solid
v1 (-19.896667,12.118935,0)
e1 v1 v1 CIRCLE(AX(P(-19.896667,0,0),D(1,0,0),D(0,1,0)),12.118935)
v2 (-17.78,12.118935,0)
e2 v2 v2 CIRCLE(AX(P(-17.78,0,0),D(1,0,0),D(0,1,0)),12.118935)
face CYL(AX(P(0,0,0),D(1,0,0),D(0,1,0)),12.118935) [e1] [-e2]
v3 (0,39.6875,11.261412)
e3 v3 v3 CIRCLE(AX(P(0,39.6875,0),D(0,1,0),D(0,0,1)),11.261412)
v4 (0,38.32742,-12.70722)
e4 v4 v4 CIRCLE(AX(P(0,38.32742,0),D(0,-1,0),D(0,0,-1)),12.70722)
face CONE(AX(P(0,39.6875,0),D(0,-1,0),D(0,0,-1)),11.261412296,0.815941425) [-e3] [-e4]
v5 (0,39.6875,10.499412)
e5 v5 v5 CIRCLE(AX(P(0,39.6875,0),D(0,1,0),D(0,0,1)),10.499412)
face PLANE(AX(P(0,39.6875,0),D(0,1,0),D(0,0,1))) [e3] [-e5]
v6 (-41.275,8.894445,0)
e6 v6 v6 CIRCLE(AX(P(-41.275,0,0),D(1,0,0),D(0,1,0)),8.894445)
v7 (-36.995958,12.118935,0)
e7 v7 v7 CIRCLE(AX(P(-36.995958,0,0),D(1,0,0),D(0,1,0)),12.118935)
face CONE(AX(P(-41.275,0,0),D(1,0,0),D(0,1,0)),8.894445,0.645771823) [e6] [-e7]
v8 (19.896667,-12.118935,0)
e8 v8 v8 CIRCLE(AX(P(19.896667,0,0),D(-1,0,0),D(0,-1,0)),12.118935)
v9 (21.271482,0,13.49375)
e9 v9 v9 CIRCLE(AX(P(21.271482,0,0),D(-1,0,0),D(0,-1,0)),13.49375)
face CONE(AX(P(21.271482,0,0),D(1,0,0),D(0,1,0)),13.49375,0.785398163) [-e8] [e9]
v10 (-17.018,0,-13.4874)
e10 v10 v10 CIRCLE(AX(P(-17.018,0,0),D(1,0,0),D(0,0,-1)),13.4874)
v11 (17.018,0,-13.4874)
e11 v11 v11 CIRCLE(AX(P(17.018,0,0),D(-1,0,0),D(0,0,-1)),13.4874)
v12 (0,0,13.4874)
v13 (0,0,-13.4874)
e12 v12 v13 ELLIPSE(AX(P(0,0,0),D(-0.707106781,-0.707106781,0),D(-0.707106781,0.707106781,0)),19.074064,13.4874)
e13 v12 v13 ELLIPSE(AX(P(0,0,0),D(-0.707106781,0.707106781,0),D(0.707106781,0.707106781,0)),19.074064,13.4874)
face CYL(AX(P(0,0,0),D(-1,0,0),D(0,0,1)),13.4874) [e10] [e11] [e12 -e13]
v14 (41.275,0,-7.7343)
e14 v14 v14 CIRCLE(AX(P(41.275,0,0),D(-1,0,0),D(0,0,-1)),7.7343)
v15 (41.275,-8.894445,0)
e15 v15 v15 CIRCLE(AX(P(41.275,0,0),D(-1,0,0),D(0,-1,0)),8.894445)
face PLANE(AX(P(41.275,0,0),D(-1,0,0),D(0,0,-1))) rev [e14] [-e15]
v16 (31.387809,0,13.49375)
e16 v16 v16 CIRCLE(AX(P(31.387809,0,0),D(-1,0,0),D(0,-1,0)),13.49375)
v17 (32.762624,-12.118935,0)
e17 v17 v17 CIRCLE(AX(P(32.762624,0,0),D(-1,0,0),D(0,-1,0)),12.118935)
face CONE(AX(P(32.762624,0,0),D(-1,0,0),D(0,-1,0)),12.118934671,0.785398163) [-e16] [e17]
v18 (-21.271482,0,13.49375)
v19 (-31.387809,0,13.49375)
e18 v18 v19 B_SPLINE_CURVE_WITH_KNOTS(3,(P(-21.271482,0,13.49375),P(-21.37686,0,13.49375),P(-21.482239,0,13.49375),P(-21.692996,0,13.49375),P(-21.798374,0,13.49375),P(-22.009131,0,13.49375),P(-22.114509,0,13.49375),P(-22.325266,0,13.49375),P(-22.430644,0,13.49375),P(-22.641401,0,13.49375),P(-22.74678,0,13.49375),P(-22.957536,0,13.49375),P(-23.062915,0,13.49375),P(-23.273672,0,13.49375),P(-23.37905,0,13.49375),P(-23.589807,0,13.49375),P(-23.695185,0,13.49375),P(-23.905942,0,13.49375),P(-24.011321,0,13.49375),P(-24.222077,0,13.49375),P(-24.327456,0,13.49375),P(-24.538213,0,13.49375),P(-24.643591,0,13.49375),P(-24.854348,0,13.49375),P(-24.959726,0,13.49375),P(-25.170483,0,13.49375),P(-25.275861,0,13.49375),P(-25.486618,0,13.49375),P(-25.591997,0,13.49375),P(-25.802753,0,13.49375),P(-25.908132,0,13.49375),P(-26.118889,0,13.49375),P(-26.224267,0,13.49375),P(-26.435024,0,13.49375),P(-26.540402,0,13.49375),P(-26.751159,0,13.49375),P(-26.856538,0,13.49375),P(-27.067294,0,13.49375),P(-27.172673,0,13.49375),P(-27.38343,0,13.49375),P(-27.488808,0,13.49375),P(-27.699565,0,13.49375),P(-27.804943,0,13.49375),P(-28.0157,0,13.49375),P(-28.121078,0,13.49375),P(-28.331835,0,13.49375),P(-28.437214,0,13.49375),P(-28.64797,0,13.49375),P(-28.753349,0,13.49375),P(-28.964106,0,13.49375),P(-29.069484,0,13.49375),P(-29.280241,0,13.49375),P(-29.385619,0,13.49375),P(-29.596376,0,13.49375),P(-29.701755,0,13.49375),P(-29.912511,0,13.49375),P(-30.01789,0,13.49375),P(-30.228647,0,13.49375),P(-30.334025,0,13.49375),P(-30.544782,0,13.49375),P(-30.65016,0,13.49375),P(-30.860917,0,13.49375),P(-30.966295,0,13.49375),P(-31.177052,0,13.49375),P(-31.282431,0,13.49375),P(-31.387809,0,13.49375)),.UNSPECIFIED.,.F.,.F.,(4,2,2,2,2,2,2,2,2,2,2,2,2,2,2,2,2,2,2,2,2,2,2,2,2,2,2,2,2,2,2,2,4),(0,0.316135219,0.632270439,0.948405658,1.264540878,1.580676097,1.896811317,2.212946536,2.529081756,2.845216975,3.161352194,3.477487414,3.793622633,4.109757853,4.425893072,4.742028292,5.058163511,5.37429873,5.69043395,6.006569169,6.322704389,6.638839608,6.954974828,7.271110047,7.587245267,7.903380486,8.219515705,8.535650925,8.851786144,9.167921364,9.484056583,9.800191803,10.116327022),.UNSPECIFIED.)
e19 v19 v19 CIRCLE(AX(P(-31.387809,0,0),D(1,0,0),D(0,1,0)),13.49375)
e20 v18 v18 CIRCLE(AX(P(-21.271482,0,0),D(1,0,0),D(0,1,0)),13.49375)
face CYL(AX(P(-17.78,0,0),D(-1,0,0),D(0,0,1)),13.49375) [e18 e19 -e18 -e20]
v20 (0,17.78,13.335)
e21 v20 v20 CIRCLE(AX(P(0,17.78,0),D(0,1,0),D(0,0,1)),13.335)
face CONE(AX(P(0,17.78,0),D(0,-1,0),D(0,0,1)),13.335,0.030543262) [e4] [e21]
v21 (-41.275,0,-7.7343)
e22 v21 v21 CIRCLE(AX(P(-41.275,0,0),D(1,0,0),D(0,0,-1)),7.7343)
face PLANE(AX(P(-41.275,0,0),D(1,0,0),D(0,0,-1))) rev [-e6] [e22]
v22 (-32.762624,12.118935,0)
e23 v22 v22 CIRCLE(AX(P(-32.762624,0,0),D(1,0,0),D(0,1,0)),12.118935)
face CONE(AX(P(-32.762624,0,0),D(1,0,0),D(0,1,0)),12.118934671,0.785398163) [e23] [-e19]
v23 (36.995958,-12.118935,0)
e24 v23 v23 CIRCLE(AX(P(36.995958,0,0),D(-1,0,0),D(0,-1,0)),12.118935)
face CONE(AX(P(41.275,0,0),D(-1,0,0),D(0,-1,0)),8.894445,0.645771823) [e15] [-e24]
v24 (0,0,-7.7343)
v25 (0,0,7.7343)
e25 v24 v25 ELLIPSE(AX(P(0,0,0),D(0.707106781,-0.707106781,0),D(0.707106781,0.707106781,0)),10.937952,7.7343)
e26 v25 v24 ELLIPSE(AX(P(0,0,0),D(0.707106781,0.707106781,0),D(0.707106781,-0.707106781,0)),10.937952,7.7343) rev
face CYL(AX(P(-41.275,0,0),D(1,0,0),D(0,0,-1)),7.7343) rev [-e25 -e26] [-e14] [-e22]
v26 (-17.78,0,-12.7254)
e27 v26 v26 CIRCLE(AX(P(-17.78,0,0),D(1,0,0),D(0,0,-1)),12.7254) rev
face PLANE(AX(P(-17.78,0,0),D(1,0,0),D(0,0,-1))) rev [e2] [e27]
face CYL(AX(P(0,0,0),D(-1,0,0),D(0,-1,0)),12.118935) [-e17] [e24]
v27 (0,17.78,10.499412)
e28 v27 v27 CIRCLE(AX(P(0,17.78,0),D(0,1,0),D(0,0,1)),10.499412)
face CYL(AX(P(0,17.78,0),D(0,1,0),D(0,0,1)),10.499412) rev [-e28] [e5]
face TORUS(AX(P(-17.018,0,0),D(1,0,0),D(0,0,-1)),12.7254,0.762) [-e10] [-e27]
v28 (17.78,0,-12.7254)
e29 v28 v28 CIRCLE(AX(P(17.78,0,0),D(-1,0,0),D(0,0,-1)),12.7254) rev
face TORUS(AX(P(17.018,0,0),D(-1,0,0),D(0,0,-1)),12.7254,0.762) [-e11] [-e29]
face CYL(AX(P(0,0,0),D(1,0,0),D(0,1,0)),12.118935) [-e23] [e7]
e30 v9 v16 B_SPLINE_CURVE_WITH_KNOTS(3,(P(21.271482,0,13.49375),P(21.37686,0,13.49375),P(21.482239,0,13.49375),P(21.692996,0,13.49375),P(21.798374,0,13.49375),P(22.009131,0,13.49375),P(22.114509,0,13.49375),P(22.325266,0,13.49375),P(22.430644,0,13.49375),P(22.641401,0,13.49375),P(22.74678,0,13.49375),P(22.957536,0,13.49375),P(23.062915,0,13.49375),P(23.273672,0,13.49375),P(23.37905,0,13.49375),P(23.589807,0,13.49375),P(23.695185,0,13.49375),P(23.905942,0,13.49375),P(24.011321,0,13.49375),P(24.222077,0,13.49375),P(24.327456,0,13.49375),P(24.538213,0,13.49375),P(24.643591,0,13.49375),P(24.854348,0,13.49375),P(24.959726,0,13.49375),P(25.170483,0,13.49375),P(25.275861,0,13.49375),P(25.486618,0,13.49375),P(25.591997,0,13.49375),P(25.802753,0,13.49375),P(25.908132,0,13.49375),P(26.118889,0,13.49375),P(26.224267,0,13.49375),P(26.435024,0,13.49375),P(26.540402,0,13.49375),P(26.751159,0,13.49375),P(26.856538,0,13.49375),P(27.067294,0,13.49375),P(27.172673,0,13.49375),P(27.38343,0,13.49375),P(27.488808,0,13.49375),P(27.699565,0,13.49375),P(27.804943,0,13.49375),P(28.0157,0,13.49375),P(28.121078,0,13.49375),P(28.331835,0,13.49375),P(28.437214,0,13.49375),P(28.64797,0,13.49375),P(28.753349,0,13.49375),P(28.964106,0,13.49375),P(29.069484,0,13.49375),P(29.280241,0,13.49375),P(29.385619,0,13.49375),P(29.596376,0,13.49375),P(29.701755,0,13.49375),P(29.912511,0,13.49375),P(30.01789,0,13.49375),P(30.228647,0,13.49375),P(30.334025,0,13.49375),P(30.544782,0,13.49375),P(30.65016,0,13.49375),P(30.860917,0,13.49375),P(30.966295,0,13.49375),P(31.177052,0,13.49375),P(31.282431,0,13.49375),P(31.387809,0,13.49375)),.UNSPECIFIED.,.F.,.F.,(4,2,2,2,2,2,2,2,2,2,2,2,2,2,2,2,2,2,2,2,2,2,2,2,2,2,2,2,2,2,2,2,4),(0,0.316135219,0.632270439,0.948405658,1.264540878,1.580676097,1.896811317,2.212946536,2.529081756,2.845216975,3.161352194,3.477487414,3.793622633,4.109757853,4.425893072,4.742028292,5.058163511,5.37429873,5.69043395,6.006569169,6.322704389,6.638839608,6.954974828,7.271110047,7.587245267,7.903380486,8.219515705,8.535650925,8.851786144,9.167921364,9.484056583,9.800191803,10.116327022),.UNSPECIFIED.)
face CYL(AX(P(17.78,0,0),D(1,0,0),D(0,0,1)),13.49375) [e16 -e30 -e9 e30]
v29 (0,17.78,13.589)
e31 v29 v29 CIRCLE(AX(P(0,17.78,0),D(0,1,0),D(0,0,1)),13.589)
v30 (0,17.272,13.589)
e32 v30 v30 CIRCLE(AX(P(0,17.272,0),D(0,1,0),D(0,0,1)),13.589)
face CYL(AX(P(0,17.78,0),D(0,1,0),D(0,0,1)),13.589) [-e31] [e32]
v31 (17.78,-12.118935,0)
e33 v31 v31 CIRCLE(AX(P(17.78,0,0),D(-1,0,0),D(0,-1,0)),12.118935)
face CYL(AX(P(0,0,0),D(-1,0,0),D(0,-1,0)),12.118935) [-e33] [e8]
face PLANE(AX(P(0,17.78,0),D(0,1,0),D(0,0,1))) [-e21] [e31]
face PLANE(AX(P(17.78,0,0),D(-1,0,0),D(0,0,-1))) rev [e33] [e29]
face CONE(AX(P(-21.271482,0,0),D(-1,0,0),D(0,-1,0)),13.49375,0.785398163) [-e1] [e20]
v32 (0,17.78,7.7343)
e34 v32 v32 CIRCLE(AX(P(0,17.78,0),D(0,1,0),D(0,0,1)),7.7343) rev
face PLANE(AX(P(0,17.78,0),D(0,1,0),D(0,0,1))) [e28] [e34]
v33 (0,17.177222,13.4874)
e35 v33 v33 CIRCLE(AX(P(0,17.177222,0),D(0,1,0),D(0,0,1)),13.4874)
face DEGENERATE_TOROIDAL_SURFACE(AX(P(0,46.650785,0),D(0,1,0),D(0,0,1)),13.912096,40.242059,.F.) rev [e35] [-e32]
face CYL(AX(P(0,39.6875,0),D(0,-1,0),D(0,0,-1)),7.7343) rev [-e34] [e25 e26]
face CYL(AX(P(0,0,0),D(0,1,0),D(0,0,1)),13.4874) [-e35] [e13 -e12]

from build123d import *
from build123d.topology import SkipClean

# Parameters (mm, degrees)
SKETCH2_R           = 13.49375
EXTRUDE1_DEPTH      = 23.495
SKETCH15_R          = 13.4874
BOSS_EXTRUDE1_DEPTH = 17.78
SKETCH16_R          = 7.7343
CUT_EXTRUDE1_DEPTH  = 46.47293924
SKETCH20_R          = 13.4874
BOSS_EXTRUDE2_DEPTH = 17.78
SKETCH22_R          = 13.335
BOSS_EXTRUDE3_DEPTH = 21.9075
BOSS_EXTRUDE3_TAPER = 1.75
CHAMFER1_SIZE       = 1.360714286
CHAMFER1_SIZE_2     = 1.404253042
SKETCH25_R          = 13.335
BOSS_EXTRUDE4_DEPTH = 21.9075
BOSS_EXTRUDE4_DRAFT = -15
SKETCH28_R          = 10.499412296
CUT_EXTRUDE6_DEPTH  = 21.9075
FILLET1_R           = 0.762
CIRPATTERN1_COUNT   = 2
CIRPATTERN1_ANGLE   = 180
SKETCH26_R          = 7.7343
CUT_EXTRUDE4_DEPTH  = 93.597306097
SKETCH29_R          = 7.7343
CUT_EXTRUDE7_DEPTH  = 59.850524324


with BuildPart() as part:
    # Sketch2 → Extrude1 (new body)
    with BuildSketch(Plane(origin=(-41.275, 0, 0), x_dir=(0, 0, -1), z_dir=(1, 0, 0))):
        with Locations(Location((0, 0, 0), (0, 0, 180))):
            Circle(SKETCH2_R)
    extrude(amount=EXTRUDE1_DEPTH)

    # Sketch5 → Cut-Revolve1 (revolve, cut)
    with BuildSketch(Plane.XY):
        Polygon((-36.995957679, 12.118934671), (-32.762624346, 12.118934671), (-31.387809017, 13.49375), (-41.275, 13.49375), (-41.275, 8.894445), align=None)
        Polygon((-17.78, 12.118934671), (-19.896666667, 12.118934671), (-21.271481995, 13.49375), (-17.78, 13.49375), align=None)
    revolve(axis=Axis((0, 0, 0), (-1, 0, 0)), mode=Mode.SUBTRACT)

    # Sketch15 → Boss-Extrude1 (add)
    with BuildSketch(Plane(origin=(-17.78, 0, 0), x_dir=(0, 0, -1), z_dir=(1, 0, 0))):
        Circle(SKETCH15_R)
    extrude(amount=BOSS_EXTRUDE1_DEPTH)

    # Sketch16 → Cut-Extrude1 (cut, through all)
    with BuildSketch(Plane(origin=(0, 0, 0), x_dir=(0, 0, -1), z_dir=(1, 0, 0))):
        Circle(SKETCH16_R)
    extrude(amount=-CUT_EXTRUDE1_DEPTH, mode=Mode.SUBTRACT)

    # Fillet1
    fillet1_edges = [part.edges().sort_by_distance(p)[0] for p in [
        (-17.78, 0, 13.4874),
    ]]
    fillet(fillet1_edges, radius=FILLET1_R)


with BuildPart() as body_2:
    # Sketch20 → Boss-Extrude2 (new body)
    with BuildSketch(Plane(origin=(0, 17.78, 0), x_dir=(-1, 0, 0), z_dir=(0, 1, 0))):
        with Locations(Location((0, 0, 0), (0, 0, 90))):
            Circle(SKETCH20_R)
    extrude(amount=-BOSS_EXTRUDE2_DEPTH)


with BuildPart() as body_3:
    # Sketch22 → Boss-Extrude3 (new body)
    with BuildSketch(Plane(origin=(0, 17.78, 0), x_dir=(-1, 0, 0), z_dir=(0, 1, 0))):
        Circle(SKETCH22_R)
    extrude(amount=BOSS_EXTRUDE3_DEPTH, taper=BOSS_EXTRUDE3_TAPER)

    # Chamfer1
    # the kernel refuses this chamfer: 1.404253042, 1.360714286 mm, written as the material it takes off along each edge
    with BuildSketch(Plane(origin=(0, 39.6875, 0), x_dir=(-1, 0, 0), z_dir=(0, 0, 1))) as chamfer1_piece_1:
        Polygon((12.665665338 + CHAMFER1_SIZE * 0.0305385132034, CHAMFER1_SIZE * 0.999533590627), (12.665665338 - CHAMFER1_SIZE_2, 0), (12.665665338, 0), align=None)
    revolve(axis=Axis((0, 39.6875, 0), (0, -1, 0)), mode=Mode.SUBTRACT)


with BuildPart() as boss_extrude4_tool:
    # Sketch25 → Boss-Extrude4 (with draft: the straight prism first)
    with BuildSketch(Plane.XZ.offset(-17.78)):
        Circle(SKETCH25_R)
    extrude(amount=-BOSS_EXTRUDE4_DEPTH)
    # Boss-Extrude4: the draft: its side faces are tilted about the plane it starts from
    boss_extrude4_sides = [boss_extrude4_tool.faces().sort_by_distance(p)[0] for p in [
        (-13.335, 28.73375, 0),
    ]]
    draft(boss_extrude4_sides, Plane.XZ.offset(-17.78), BOSS_EXTRUDE4_DRAFT)


with BuildPart() as body_3_1:
    add(body_3.part)

    # Boss-Extrude4: add boss_extrude4_tool
    add(boss_extrude4_tool.part)

    # Sketch28 → Cut-Extrude6 (cut)
    with BuildSketch(Plane(origin=(0, 39.6875, 0), x_dir=(1, 0, 0), z_dir=(0, 1, 0))):
        with Locations(Location((0, 0, 0), (0, 0, 270))):
            Circle(SKETCH28_R)
    extrude(amount=-CUT_EXTRUDE6_DEPTH, mode=Mode.SUBTRACT)


with BuildPart() as cirpattern1_1:
    # CirPattern1: pattern copy
    add(part.part.rotate(Axis((0, 0, 12.651043997), (0, 0, -1)), 1 * CIRPATTERN1_ANGLE / (CIRPATTERN1_COUNT - 1)))


with BuildPart() as part_1:
    add(part.part)

    # Combine2: union body 3, body 2, CirPattern1_1
    add(body_3_1.part)
    add(body_2.part)
    add(cirpattern1_1.part)

    # Sketch30 → Revolve1 (revolve)
    with SkipClean():  # the faces are left unmerged after this step: merging them gives an invalid solid
        with BuildSketch(Plane.XY, mode=Mode.PRIVATE) as revolve1_sk:
            with BuildLine():
                Line((0, 17.78), (0, 8.89))
                ThreePointArc((0, 8.89), (-7.214370781, 12.4003004), (-13.589, 17.272))
                Line((-13.589, 17.272), (-13.589, 17.78))
                Line((-13.589, 17.78), (0, 17.78))
            make_face()
        revolve(revolve1_sk.sketch.rotate(Axis((0, 17.78, 0), (0, -1, 0)), 270), axis=Axis((0, 17.78, 0), (0, -1, 0)))

    # Sketch26 → Cut-Extrude4 (cut, through all)
    with SkipClean():  # the faces are left unmerged after this step: merging them gives an invalid solid
        with BuildSketch(Plane.ZY.offset(41.275)):
            with Locations(Location((0, 0, 0), (0, 0, 180))):
                Circle(SKETCH26_R)
        extrude(amount=-CUT_EXTRUDE4_DEPTH, mode=Mode.SUBTRACT)

    # Sketch29 → Cut-Extrude7 (cut, through all)
    with SkipClean():  # the faces are left unmerged after this step: merging them gives an invalid solid
        with BuildSketch(Plane(origin=(0, 0, 0), x_dir=(1, 0, 0), z_dir=(0, 1, 0))):
            with Locations(Location((0, 0, 0), (0, 0, 270))):
                Circle(SKETCH29_R)
        extrude(amount=CUT_EXTRUDE7_DEPTH, mode=Mode.SUBTRACT)


solid = part_1.part
